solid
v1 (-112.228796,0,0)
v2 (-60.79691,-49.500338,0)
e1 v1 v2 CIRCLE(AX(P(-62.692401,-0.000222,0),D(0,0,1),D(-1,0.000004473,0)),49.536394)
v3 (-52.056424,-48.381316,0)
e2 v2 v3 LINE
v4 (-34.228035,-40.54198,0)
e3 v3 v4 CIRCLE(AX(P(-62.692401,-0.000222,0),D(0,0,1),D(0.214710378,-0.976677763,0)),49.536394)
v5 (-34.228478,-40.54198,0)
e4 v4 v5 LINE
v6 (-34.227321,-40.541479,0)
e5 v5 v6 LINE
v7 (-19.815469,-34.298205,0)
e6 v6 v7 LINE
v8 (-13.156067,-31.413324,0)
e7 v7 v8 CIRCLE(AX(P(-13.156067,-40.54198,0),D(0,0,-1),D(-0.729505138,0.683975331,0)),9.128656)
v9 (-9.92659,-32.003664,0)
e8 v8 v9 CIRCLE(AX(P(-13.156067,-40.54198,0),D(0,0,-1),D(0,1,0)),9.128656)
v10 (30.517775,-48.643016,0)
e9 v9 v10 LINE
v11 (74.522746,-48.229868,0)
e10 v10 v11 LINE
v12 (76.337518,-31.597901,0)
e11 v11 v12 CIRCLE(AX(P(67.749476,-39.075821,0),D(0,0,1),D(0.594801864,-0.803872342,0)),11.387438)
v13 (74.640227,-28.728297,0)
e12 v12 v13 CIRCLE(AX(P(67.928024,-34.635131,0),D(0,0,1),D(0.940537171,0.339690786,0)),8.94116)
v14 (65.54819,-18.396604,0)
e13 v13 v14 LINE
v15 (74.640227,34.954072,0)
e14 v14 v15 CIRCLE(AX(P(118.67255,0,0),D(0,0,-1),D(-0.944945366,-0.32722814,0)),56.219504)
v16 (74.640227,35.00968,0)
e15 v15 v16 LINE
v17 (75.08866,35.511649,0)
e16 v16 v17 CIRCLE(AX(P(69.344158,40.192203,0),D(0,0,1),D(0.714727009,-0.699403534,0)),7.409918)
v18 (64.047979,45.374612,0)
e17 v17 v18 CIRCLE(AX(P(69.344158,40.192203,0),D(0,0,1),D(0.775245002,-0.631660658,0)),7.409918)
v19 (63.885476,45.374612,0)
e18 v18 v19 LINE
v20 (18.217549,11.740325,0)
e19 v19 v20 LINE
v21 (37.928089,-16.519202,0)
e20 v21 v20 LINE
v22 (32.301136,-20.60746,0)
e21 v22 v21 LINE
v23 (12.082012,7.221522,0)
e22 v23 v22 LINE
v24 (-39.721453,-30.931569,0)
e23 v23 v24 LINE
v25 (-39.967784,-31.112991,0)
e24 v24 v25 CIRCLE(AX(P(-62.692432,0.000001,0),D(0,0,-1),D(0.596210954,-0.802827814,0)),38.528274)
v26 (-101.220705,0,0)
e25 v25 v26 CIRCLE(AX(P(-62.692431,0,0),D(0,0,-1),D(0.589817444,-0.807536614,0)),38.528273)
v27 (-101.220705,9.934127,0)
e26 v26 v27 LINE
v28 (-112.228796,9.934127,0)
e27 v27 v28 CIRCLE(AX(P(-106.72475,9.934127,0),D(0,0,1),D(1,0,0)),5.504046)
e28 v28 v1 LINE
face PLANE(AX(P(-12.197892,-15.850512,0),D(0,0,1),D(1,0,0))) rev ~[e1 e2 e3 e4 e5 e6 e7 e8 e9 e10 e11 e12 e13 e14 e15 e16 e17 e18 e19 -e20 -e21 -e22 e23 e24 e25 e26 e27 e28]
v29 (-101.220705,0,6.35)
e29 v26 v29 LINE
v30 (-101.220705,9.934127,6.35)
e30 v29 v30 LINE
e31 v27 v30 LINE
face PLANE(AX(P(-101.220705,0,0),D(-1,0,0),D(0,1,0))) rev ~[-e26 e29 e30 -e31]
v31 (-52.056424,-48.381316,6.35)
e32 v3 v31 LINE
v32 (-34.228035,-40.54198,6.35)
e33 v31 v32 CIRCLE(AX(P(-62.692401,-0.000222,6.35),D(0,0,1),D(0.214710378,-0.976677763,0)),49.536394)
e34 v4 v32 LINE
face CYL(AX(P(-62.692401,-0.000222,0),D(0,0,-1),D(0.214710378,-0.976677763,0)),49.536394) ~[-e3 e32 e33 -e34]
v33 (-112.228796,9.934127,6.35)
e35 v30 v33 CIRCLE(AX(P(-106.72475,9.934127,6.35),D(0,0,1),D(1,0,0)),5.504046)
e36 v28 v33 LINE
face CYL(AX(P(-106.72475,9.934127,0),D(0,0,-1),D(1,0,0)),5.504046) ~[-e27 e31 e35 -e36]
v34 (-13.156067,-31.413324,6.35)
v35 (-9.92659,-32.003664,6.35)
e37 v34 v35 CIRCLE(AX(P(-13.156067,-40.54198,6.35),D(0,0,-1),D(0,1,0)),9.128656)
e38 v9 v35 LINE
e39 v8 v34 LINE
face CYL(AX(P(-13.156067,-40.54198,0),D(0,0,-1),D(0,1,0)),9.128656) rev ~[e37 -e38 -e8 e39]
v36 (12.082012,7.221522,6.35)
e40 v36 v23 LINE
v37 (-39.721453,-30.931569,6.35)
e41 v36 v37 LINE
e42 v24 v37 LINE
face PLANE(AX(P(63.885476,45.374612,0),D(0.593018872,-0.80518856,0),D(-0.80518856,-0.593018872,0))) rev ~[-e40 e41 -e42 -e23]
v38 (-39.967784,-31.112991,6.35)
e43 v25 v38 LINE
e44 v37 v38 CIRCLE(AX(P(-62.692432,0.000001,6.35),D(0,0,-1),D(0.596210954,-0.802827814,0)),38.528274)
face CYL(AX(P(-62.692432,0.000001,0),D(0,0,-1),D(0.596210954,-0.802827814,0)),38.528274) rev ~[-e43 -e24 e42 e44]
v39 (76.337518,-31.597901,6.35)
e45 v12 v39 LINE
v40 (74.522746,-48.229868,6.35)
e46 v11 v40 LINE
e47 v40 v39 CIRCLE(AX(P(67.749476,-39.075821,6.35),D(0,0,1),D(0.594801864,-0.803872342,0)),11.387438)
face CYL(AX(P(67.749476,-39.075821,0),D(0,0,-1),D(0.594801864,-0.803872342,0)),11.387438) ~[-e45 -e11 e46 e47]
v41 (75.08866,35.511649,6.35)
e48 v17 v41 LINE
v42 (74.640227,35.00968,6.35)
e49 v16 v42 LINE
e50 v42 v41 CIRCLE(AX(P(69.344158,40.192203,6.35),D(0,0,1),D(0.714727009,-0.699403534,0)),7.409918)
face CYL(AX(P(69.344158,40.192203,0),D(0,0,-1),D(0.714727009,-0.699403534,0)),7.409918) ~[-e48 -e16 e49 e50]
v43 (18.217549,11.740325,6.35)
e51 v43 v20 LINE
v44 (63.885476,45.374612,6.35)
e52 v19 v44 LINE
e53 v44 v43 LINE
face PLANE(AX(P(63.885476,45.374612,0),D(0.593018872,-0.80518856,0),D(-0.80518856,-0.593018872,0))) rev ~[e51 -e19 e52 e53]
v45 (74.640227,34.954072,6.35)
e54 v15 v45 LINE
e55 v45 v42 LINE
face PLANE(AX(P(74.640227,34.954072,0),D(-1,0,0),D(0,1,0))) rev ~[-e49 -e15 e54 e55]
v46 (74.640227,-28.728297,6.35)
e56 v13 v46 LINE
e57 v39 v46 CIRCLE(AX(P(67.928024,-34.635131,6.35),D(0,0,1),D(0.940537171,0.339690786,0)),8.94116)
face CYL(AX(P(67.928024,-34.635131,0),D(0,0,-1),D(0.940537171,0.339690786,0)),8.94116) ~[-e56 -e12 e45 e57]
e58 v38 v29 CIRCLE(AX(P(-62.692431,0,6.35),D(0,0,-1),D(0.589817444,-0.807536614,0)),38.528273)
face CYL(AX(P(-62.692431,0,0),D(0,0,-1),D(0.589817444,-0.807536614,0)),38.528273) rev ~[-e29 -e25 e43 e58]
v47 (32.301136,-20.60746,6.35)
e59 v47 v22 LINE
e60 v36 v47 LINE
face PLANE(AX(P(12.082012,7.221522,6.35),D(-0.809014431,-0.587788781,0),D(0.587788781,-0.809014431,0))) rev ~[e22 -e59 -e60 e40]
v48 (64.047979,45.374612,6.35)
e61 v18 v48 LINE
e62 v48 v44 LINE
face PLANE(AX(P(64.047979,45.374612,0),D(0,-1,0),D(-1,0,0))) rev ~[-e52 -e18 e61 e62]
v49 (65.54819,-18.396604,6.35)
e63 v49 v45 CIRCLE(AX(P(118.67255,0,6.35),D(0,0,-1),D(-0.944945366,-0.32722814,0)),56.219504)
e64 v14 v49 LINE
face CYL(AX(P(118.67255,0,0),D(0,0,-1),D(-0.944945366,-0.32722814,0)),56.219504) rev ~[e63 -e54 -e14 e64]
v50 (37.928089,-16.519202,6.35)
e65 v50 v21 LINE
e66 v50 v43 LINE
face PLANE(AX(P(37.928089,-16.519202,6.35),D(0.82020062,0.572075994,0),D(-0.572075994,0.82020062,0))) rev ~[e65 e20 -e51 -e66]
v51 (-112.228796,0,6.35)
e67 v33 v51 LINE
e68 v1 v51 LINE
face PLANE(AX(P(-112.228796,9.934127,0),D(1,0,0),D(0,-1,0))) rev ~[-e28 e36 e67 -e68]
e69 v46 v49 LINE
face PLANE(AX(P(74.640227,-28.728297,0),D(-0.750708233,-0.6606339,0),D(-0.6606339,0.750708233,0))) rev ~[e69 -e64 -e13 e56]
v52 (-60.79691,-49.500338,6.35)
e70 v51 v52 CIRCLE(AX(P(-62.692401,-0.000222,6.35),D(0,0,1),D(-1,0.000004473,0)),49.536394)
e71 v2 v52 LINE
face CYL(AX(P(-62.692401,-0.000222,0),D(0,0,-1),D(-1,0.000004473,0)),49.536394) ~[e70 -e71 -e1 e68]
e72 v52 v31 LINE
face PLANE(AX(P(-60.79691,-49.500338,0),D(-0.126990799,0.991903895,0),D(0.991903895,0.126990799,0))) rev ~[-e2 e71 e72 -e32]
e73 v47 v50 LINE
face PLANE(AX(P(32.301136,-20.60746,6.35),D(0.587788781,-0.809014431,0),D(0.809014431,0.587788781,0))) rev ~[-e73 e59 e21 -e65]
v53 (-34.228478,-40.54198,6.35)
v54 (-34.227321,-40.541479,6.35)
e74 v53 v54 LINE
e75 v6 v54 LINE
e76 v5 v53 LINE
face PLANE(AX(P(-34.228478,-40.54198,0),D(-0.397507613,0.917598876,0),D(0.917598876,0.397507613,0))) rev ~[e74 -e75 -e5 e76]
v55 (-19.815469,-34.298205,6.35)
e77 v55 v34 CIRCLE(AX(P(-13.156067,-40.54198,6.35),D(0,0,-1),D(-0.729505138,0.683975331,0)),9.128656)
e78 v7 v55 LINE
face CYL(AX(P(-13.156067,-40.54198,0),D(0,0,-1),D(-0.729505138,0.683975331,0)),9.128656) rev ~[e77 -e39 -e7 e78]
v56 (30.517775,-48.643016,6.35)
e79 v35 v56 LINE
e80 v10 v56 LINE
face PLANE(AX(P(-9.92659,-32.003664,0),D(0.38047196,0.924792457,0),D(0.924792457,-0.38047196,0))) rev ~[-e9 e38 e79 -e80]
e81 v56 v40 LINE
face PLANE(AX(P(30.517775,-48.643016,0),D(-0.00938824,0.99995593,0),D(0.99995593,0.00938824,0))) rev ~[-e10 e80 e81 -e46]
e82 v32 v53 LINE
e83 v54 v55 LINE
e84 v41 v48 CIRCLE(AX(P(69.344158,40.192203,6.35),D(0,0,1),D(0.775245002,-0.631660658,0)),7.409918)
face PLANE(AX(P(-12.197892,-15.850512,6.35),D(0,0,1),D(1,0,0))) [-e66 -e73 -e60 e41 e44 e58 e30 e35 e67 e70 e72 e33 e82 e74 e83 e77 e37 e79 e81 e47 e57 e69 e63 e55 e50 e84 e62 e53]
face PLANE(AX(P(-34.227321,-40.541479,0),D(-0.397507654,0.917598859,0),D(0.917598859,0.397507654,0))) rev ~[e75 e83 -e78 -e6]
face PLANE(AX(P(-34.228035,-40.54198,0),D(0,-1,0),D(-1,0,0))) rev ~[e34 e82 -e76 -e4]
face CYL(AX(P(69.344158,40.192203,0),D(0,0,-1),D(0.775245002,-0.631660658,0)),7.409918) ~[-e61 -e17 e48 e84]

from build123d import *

# Parameters (mm, degrees)
F1_DEPTH = 6.35
F3_DEPTH = 6.351


with BuildPart() as f1:
    # F0 (on Top) → F1 (new body)
    with BuildSketch(Plane.XY):
        with BuildLine():
            Line((64.0479785321, 45.3746123328), (63.8854764337, 45.3746123328))
            Line((63.8854764337, 45.3746123328), (2.2767815665, 0))
            Line((2.2767815665, 0), (-39.7214530308, -30.9315692797))
            ThreePointArc((-39.7214530308, -30.9315692797), (-39.8444384128, -31.0225247493), (-39.9677839364, -31.1129912262))
            ThreePointArc((-39.9677839364, -31.1129912262), (-80.1407322996, -34.3509043357), (-101.2207046151, 0))
            Line((-101.2207046151, 0), (-101.2207046151, 9.9341273308))
            ThreePointArc((-101.2207046151, 9.9341273308), (-106.7247502506, 15.4381729662), (-112.228795886, 9.9341273308))
            Line((-112.228795886, 9.9341273308), (-112.228795886, 0))
            ThreePointArc((-112.228795886, 0), (-97.0433078129, -35.6915315199), (-60.7969101261, -49.5003375864))
            Line((-60.7969101261, -49.5003375864), (-52.0564235031, -48.3813164917))
            ThreePointArc((-52.0564235031, -48.3813164917), (-42.7531679645, -45.3464600069), (-34.228034924, -40.5419804156))
            Line((-34.228034924, -40.5419804156), (-34.2284778363, -40.5419804156))
            Line((-34.2284778363, -40.5419804156), (-34.2273214057, -40.5414794451))
            Line((-34.2273214057, -40.5414794451), (-19.8154687348, -34.2982047457))
            ThreePointArc((-19.8154687348, -34.2982047457), (-16.7847778238, -32.1655358704), (-13.1560671025, -31.4133241773))
            ThreePointArc((-13.1560671025, -31.4133241773), (-11.5145721435, -31.5621218969), (-9.9265901442, -32.0036642296))
            Line((-9.9265901442, -32.0036642296), (30.5177745747, -48.6430156736))
            Line((30.5177745747, -48.6430156736), (74.522745552, -48.229868259))
            ThreePointArc((74.522745552, -48.229868259), (79.0697257066, -40.3110135201), (76.337517689, -31.5979010883))
            ThreePointArc((76.337517689, -31.5979010883), (75.6238074008, -30.083288758), (74.6402267249, -28.7282972671))
            Line((74.6402267249, -28.7282972671), (65.5481898023, -18.39660376))
            ThreePointArc((65.5481898023, -18.39660376), (63.2520758801, 9.4447724115), (74.6402267249, 34.9540724138))
            Line((74.6402267249, 34.9540724138), (74.6402267249, 35.0096798031))
            ThreePointArc((74.6402267249, 35.0096798031), (74.8701460848, 35.255569914), (75.088660103, 35.5116489692))
            ThreePointArc((75.088660103, 35.5116489692), (74.2807317817, 45.7182435688), (64.0479785321, 45.3746123328))
        make_face()
    extrude(amount=F1_DEPTH)

    # F2 (on face) → F3 (cut, through all)
    with BuildSketch(Plane.XY.offset(6.35)):
        Polygon((12.0820117015, 7.2215215266), (32.3011358824, -20.6074602199), (37.9280887206, -16.5192021861), (18.2175485278, 11.7403253342), align=None)
    extrude(amount=-F3_DEPTH, mode=Mode.SUBTRACT)


solid = f1.part
